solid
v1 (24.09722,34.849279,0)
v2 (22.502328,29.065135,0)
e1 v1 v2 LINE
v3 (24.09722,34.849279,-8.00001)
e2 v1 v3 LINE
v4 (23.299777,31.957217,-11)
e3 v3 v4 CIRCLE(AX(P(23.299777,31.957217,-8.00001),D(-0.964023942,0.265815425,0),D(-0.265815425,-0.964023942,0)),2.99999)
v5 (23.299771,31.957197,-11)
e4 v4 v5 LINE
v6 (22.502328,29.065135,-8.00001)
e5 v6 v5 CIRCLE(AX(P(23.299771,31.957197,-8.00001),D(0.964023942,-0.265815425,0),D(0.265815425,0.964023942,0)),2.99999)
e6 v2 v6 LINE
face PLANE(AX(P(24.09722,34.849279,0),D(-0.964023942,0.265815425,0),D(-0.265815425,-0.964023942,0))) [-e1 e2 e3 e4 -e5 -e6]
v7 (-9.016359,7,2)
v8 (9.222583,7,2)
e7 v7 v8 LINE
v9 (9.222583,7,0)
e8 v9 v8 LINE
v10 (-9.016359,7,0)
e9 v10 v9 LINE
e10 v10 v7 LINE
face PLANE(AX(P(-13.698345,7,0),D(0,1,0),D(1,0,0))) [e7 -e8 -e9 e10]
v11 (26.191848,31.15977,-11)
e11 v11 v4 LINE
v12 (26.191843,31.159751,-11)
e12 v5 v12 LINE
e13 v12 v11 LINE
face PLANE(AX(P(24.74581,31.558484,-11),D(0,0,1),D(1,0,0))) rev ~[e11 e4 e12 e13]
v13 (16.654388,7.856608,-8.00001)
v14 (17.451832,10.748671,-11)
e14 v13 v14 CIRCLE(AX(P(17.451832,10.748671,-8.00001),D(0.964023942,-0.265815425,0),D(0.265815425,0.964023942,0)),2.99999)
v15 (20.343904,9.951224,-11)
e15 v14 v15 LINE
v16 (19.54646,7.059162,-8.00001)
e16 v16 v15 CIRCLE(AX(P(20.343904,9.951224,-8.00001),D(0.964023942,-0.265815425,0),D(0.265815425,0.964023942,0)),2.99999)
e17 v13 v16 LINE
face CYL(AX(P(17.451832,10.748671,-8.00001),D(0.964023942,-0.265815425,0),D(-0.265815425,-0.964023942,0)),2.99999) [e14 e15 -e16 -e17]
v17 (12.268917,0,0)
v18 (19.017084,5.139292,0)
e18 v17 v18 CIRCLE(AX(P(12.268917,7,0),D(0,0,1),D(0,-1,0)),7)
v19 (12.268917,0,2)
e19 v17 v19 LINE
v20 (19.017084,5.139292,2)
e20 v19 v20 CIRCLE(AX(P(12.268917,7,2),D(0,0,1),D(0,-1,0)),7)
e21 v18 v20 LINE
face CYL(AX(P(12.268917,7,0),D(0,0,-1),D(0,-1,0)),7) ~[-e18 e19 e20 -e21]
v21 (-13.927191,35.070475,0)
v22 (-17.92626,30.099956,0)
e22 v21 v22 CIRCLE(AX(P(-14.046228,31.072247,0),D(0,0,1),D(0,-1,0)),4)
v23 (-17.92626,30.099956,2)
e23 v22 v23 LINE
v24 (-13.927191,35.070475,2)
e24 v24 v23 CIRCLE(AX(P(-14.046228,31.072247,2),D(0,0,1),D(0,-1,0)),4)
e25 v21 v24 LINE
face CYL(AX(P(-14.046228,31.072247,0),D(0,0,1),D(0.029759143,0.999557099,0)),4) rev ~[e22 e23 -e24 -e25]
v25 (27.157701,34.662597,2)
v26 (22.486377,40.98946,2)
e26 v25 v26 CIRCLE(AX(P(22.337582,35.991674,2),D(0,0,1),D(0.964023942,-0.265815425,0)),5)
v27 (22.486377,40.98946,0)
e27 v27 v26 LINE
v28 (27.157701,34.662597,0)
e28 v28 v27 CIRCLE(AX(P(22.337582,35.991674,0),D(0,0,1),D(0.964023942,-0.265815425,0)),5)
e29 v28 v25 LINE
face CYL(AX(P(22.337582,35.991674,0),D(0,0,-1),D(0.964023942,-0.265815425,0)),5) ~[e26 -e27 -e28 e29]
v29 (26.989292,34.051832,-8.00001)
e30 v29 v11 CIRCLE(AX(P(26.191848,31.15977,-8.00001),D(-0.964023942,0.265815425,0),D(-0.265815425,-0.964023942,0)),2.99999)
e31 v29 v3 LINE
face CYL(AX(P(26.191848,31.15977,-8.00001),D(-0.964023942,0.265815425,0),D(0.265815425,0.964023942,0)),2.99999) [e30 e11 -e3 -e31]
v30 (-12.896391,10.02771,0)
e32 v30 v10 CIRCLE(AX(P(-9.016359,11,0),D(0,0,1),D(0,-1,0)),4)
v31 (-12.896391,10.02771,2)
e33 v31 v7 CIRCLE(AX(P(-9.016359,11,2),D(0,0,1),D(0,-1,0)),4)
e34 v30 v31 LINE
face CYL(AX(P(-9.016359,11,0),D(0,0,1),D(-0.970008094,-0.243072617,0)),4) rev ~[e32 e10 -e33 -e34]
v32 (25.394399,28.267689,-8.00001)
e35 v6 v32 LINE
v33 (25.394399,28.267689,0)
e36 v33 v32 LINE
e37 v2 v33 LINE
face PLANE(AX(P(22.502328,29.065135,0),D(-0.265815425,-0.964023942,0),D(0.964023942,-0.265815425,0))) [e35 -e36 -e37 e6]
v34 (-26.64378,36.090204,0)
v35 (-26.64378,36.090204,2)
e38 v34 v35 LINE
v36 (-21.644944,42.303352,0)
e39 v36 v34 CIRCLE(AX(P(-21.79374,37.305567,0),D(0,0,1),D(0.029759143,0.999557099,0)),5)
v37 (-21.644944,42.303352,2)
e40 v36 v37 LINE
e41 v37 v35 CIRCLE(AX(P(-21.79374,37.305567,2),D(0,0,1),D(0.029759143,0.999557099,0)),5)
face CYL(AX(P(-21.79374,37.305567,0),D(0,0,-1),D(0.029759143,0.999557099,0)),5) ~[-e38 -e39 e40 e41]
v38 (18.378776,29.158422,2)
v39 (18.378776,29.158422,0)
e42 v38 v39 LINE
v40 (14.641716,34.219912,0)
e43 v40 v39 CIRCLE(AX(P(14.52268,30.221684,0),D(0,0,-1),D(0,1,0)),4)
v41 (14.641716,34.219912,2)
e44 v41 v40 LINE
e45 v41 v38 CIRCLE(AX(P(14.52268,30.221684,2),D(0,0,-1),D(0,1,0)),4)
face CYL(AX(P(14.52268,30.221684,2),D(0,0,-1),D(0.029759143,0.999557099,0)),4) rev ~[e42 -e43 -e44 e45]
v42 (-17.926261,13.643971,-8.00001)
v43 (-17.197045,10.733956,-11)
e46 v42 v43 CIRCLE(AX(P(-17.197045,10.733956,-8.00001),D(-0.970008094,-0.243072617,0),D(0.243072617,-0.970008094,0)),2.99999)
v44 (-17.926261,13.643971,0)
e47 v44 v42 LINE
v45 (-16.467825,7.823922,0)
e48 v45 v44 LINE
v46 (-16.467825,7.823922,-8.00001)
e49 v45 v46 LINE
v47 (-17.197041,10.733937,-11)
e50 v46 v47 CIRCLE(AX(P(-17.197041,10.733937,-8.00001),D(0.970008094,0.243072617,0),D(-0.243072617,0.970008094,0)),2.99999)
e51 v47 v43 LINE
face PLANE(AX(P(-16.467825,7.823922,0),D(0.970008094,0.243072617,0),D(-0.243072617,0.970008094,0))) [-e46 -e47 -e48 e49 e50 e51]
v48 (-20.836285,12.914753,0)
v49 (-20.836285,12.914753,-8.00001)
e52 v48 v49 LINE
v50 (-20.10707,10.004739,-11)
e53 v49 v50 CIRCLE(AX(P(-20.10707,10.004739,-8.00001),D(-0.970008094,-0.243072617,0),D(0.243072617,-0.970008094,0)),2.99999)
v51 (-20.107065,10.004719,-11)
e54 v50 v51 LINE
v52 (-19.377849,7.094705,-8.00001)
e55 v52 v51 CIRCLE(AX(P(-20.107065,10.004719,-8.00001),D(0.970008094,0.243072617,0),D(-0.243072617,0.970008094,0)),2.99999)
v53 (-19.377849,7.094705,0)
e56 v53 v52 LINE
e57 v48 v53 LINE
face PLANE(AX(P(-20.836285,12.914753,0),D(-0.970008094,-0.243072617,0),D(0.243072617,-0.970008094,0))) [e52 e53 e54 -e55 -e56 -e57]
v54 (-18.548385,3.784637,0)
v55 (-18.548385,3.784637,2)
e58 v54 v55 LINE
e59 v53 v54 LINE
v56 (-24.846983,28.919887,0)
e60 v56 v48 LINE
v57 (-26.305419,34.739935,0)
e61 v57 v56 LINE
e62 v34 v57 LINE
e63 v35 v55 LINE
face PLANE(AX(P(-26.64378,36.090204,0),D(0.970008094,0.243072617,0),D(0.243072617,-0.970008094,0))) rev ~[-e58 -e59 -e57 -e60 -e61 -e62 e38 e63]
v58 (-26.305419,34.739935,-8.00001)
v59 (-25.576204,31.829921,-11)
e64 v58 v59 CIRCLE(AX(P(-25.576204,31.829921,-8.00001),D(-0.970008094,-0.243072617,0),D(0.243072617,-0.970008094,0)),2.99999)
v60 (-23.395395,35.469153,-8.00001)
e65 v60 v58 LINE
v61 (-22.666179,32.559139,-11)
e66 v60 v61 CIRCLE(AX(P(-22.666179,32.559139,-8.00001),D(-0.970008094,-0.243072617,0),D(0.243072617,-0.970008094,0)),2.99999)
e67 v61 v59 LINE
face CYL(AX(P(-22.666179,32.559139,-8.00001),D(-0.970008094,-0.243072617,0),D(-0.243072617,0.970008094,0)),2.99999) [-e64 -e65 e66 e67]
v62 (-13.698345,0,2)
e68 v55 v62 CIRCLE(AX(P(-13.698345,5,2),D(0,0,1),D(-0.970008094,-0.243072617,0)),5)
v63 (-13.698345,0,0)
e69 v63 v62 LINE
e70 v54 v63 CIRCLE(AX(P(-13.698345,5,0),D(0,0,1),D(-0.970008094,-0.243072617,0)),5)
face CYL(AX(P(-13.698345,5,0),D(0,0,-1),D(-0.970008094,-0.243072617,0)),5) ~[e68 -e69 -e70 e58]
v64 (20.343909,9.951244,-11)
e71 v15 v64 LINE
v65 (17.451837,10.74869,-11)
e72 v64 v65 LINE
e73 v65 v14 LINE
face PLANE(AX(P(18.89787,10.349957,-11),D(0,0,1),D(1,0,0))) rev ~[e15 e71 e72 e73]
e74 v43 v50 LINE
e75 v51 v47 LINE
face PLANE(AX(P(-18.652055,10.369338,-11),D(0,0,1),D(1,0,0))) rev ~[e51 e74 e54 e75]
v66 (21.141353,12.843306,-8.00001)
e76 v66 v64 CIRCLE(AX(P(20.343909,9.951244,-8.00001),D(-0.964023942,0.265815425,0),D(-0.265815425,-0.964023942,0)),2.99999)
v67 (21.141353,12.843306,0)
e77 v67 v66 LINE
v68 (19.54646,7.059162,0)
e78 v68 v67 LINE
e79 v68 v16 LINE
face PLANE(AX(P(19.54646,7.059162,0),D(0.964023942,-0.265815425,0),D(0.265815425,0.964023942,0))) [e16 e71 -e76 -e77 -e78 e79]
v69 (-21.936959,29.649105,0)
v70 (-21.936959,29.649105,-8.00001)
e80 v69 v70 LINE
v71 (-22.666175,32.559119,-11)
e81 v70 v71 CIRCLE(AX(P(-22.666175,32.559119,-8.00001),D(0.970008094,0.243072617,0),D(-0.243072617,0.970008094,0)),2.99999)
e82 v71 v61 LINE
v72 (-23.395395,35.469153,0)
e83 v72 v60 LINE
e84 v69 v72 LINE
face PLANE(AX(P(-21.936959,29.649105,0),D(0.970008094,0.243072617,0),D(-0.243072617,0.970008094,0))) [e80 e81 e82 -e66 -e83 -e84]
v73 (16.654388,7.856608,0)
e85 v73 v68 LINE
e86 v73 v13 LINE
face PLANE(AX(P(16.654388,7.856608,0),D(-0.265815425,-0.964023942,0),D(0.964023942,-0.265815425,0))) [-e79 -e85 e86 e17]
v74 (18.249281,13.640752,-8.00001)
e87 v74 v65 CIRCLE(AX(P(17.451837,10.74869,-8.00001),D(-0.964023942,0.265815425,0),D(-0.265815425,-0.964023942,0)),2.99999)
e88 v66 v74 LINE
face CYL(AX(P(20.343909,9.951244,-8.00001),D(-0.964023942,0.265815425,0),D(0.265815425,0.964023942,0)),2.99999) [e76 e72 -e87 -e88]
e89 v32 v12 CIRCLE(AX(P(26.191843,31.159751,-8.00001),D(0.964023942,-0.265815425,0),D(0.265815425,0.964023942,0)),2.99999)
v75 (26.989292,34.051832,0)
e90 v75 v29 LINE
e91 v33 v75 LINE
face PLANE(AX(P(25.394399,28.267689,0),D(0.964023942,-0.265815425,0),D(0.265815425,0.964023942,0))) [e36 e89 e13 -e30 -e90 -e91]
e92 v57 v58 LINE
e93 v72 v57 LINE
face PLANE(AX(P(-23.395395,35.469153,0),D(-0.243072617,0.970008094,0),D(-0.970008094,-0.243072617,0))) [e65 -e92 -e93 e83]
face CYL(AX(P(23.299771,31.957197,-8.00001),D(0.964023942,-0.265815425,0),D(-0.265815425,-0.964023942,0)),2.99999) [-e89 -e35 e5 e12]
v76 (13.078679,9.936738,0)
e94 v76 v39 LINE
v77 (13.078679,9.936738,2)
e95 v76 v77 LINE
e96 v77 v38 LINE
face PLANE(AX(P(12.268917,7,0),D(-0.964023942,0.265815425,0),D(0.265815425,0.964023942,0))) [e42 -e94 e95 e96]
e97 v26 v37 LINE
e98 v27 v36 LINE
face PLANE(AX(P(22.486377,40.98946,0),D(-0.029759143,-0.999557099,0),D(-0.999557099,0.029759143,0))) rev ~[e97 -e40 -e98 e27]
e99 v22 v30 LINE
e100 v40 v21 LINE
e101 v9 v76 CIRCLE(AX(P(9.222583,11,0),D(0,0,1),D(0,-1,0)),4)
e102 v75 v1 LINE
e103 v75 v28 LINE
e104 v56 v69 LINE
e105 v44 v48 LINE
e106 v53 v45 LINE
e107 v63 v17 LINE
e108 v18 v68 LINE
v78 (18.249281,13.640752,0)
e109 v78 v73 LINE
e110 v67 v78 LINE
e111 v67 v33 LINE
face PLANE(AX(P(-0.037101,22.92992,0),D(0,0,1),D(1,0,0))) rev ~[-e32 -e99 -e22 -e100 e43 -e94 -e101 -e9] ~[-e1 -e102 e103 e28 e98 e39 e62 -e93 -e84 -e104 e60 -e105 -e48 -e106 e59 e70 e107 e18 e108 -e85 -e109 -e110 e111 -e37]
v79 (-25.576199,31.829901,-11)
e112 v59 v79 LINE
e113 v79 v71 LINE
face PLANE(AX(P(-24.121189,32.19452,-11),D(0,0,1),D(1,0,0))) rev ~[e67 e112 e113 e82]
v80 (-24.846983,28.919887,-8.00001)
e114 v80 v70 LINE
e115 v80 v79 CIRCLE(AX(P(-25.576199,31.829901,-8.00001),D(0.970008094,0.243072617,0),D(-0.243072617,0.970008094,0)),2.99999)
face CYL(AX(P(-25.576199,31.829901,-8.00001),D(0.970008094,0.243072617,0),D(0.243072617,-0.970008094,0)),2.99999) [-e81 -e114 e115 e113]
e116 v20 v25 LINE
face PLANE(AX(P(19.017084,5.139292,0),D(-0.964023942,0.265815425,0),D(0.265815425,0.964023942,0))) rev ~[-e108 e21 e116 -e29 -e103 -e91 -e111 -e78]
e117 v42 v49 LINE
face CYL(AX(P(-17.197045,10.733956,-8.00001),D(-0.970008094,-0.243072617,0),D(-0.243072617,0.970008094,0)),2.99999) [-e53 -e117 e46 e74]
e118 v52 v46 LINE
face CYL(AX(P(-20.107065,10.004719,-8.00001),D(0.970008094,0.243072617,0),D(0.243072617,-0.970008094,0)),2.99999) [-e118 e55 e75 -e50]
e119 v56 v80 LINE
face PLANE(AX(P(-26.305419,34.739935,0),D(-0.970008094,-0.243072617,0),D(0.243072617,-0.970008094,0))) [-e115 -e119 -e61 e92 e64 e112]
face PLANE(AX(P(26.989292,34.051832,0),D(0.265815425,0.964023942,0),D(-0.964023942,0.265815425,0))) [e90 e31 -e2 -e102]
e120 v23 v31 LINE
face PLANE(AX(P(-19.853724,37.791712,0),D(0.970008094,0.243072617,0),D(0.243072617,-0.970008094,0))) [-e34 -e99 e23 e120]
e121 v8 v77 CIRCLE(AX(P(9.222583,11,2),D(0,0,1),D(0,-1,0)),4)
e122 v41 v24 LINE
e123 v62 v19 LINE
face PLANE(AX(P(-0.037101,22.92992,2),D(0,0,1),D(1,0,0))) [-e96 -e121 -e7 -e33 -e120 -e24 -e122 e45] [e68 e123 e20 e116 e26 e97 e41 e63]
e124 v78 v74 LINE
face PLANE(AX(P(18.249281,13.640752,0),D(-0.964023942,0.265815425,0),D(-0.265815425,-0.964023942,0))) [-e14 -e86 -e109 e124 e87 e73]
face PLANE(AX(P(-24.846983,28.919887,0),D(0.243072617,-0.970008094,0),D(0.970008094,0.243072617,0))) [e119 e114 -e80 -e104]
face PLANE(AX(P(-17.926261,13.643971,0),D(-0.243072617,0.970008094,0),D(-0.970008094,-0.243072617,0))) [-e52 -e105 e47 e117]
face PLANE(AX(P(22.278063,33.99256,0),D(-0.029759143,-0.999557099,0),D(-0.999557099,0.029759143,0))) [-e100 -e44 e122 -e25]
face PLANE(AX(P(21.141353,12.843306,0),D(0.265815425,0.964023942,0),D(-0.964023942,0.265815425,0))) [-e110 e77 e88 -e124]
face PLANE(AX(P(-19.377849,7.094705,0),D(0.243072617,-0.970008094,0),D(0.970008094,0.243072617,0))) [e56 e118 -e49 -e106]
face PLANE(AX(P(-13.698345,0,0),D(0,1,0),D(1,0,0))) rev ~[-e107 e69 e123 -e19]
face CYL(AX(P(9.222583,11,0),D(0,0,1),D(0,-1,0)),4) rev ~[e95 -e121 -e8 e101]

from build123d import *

# Parameters (mm, degrees)
F2_DEPTH = 2
F3_T     = 7
F4_R     = 4
F6_DEPTH = 11
F7_R     = 2.99999


# Not quite as in the source:
# - a fillet or chamfer is up to 0.001 mm smaller than in the source, because OpenCascade refuses the exact size
# - a shell that OpenCascade refuses in one call is made with other operations: the cavity is built on its own and cut out


with BuildPart() as f2:
    # F1 (on Top) → F2 (new body)
    with BuildSketch(Plane.XY):
        with BuildLine():
            ThreePointArc((-21.6449442268, 42.3033521048), (-25.6894079684, 40.4398561051), (-26.6437804137, 36.0902035288))
            Line((-26.6437804137, 36.0902035288), (-18.5483854863, 3.7846369171))
            ThreePointArc((-18.5483854863, 3.7846369171), (-16.7743151531, 1.0581212972), (-13.6983450146, 0))
            Line((-13.6983450146, 0), (12.2689166074, 0))
            ThreePointArc((12.2689166074, 0), (16.5100865033, 1.4311152002), (19.017084198, 5.1392920247))
            Line((19.017084198, 5.1392920247), (27.1577014469, 34.6625972473))
            ThreePointArc((27.1577014469, 34.6625972473), (26.3599974025, 38.9615518502), (22.4863774545, 40.9894598656))
            Line((22.4863774545, 40.9894598656), (-21.6449442268, 42.3033521048))
        make_face()
    extrude(amount=F2_DEPTH)

    # F3: shell of thickness 7, made by hand


with BuildPart() as f3_core1:
    # F3_t2: copy of F2
    add(f2.part)

    # the walls: a layer under each face that stays
    f3_faces = [f3_core1.faces().sort_by_distance(p)[0] for p in [
        (0.4207166138, 41.6464059852, 1),
        (-22.59608295, 19.937420223, 1),
        (-0.7147142036, 0, 1),
        (23.0873928224, 19.900944636, 1),
    ]]
    thicken(f3_faces, amount=-F3_T, mode=Mode.SUBTRACT)


with BuildPart() as f2_1:
    add(f2.part)

    # what is left inside the walls is the cavity
    f3_cavity = [f3_core1.part.solids().sort_by_distance(p)[0] for p in [
        (0.260689, 16.409264, 0.07),
    ]]
    add(f3_cavity, mode=Mode.SUBTRACT)

    # F4
    f4_edges = [f2_1.edges().sort_by_distance(p)[0] for p in [
        (19.732614, 34.068344, 1),
        (-19.211236, 35.227793, 1),
        (-12.137683, 7, 1),
        (12.268917, 7, 1),
    ]]
    fillet(f4_edges, radius=F4_R)

    # F5 (on face) → F6 (join)
    with BuildSketch(Plane.XY):
        Polygon((-23.3953947844, 35.4691530951), (-26.3054190674, 34.7399352453), (-24.8469833679, 28.9198866794), (-21.9369590849, 29.6491045291), align=None)
        Polygon((25.3943994744, 28.2676887604), (26.9892920247, 34.0518324094), (24.0972202001, 34.8492786846), (22.5023276498, 29.0651350355), align=None)
        Polygon((-19.3778494948, 7.0947045569), (-16.4678252118, 7.8239224066), (-17.9262609113, 13.6439709726), (-20.8362851943, 12.9147531229), align=None)
        Polygon((18.249280849, 13.6407519713), (16.6543882988, 7.8566083223), (19.5464601233, 7.0591620471), (21.1413526736, 12.8433056962), align=None)
    extrude(amount=-F6_DEPTH)

    # F7 (radius 3 in the source; OpenCascade refuses exactly that, so slightly less here)
    f7_edges = [f2_1.edges().sort_by_distance(p)[0] for p in [
        (25.543256, 34.450556, -11),
        (23.948364, 28.666412, -11),
        (19.695317, 13.242029, -11),
        (18.100424, 7.457885, -11),
        (-17.922837, 7.459313, -11),
        (-19.381273, 13.279362, -11),
        (-23.391971, 29.284496, -11),
        (-24.850407, 35.104544, -11),
    ]]
    fillet(f7_edges, radius=F7_R)


solid = f2_1.part
